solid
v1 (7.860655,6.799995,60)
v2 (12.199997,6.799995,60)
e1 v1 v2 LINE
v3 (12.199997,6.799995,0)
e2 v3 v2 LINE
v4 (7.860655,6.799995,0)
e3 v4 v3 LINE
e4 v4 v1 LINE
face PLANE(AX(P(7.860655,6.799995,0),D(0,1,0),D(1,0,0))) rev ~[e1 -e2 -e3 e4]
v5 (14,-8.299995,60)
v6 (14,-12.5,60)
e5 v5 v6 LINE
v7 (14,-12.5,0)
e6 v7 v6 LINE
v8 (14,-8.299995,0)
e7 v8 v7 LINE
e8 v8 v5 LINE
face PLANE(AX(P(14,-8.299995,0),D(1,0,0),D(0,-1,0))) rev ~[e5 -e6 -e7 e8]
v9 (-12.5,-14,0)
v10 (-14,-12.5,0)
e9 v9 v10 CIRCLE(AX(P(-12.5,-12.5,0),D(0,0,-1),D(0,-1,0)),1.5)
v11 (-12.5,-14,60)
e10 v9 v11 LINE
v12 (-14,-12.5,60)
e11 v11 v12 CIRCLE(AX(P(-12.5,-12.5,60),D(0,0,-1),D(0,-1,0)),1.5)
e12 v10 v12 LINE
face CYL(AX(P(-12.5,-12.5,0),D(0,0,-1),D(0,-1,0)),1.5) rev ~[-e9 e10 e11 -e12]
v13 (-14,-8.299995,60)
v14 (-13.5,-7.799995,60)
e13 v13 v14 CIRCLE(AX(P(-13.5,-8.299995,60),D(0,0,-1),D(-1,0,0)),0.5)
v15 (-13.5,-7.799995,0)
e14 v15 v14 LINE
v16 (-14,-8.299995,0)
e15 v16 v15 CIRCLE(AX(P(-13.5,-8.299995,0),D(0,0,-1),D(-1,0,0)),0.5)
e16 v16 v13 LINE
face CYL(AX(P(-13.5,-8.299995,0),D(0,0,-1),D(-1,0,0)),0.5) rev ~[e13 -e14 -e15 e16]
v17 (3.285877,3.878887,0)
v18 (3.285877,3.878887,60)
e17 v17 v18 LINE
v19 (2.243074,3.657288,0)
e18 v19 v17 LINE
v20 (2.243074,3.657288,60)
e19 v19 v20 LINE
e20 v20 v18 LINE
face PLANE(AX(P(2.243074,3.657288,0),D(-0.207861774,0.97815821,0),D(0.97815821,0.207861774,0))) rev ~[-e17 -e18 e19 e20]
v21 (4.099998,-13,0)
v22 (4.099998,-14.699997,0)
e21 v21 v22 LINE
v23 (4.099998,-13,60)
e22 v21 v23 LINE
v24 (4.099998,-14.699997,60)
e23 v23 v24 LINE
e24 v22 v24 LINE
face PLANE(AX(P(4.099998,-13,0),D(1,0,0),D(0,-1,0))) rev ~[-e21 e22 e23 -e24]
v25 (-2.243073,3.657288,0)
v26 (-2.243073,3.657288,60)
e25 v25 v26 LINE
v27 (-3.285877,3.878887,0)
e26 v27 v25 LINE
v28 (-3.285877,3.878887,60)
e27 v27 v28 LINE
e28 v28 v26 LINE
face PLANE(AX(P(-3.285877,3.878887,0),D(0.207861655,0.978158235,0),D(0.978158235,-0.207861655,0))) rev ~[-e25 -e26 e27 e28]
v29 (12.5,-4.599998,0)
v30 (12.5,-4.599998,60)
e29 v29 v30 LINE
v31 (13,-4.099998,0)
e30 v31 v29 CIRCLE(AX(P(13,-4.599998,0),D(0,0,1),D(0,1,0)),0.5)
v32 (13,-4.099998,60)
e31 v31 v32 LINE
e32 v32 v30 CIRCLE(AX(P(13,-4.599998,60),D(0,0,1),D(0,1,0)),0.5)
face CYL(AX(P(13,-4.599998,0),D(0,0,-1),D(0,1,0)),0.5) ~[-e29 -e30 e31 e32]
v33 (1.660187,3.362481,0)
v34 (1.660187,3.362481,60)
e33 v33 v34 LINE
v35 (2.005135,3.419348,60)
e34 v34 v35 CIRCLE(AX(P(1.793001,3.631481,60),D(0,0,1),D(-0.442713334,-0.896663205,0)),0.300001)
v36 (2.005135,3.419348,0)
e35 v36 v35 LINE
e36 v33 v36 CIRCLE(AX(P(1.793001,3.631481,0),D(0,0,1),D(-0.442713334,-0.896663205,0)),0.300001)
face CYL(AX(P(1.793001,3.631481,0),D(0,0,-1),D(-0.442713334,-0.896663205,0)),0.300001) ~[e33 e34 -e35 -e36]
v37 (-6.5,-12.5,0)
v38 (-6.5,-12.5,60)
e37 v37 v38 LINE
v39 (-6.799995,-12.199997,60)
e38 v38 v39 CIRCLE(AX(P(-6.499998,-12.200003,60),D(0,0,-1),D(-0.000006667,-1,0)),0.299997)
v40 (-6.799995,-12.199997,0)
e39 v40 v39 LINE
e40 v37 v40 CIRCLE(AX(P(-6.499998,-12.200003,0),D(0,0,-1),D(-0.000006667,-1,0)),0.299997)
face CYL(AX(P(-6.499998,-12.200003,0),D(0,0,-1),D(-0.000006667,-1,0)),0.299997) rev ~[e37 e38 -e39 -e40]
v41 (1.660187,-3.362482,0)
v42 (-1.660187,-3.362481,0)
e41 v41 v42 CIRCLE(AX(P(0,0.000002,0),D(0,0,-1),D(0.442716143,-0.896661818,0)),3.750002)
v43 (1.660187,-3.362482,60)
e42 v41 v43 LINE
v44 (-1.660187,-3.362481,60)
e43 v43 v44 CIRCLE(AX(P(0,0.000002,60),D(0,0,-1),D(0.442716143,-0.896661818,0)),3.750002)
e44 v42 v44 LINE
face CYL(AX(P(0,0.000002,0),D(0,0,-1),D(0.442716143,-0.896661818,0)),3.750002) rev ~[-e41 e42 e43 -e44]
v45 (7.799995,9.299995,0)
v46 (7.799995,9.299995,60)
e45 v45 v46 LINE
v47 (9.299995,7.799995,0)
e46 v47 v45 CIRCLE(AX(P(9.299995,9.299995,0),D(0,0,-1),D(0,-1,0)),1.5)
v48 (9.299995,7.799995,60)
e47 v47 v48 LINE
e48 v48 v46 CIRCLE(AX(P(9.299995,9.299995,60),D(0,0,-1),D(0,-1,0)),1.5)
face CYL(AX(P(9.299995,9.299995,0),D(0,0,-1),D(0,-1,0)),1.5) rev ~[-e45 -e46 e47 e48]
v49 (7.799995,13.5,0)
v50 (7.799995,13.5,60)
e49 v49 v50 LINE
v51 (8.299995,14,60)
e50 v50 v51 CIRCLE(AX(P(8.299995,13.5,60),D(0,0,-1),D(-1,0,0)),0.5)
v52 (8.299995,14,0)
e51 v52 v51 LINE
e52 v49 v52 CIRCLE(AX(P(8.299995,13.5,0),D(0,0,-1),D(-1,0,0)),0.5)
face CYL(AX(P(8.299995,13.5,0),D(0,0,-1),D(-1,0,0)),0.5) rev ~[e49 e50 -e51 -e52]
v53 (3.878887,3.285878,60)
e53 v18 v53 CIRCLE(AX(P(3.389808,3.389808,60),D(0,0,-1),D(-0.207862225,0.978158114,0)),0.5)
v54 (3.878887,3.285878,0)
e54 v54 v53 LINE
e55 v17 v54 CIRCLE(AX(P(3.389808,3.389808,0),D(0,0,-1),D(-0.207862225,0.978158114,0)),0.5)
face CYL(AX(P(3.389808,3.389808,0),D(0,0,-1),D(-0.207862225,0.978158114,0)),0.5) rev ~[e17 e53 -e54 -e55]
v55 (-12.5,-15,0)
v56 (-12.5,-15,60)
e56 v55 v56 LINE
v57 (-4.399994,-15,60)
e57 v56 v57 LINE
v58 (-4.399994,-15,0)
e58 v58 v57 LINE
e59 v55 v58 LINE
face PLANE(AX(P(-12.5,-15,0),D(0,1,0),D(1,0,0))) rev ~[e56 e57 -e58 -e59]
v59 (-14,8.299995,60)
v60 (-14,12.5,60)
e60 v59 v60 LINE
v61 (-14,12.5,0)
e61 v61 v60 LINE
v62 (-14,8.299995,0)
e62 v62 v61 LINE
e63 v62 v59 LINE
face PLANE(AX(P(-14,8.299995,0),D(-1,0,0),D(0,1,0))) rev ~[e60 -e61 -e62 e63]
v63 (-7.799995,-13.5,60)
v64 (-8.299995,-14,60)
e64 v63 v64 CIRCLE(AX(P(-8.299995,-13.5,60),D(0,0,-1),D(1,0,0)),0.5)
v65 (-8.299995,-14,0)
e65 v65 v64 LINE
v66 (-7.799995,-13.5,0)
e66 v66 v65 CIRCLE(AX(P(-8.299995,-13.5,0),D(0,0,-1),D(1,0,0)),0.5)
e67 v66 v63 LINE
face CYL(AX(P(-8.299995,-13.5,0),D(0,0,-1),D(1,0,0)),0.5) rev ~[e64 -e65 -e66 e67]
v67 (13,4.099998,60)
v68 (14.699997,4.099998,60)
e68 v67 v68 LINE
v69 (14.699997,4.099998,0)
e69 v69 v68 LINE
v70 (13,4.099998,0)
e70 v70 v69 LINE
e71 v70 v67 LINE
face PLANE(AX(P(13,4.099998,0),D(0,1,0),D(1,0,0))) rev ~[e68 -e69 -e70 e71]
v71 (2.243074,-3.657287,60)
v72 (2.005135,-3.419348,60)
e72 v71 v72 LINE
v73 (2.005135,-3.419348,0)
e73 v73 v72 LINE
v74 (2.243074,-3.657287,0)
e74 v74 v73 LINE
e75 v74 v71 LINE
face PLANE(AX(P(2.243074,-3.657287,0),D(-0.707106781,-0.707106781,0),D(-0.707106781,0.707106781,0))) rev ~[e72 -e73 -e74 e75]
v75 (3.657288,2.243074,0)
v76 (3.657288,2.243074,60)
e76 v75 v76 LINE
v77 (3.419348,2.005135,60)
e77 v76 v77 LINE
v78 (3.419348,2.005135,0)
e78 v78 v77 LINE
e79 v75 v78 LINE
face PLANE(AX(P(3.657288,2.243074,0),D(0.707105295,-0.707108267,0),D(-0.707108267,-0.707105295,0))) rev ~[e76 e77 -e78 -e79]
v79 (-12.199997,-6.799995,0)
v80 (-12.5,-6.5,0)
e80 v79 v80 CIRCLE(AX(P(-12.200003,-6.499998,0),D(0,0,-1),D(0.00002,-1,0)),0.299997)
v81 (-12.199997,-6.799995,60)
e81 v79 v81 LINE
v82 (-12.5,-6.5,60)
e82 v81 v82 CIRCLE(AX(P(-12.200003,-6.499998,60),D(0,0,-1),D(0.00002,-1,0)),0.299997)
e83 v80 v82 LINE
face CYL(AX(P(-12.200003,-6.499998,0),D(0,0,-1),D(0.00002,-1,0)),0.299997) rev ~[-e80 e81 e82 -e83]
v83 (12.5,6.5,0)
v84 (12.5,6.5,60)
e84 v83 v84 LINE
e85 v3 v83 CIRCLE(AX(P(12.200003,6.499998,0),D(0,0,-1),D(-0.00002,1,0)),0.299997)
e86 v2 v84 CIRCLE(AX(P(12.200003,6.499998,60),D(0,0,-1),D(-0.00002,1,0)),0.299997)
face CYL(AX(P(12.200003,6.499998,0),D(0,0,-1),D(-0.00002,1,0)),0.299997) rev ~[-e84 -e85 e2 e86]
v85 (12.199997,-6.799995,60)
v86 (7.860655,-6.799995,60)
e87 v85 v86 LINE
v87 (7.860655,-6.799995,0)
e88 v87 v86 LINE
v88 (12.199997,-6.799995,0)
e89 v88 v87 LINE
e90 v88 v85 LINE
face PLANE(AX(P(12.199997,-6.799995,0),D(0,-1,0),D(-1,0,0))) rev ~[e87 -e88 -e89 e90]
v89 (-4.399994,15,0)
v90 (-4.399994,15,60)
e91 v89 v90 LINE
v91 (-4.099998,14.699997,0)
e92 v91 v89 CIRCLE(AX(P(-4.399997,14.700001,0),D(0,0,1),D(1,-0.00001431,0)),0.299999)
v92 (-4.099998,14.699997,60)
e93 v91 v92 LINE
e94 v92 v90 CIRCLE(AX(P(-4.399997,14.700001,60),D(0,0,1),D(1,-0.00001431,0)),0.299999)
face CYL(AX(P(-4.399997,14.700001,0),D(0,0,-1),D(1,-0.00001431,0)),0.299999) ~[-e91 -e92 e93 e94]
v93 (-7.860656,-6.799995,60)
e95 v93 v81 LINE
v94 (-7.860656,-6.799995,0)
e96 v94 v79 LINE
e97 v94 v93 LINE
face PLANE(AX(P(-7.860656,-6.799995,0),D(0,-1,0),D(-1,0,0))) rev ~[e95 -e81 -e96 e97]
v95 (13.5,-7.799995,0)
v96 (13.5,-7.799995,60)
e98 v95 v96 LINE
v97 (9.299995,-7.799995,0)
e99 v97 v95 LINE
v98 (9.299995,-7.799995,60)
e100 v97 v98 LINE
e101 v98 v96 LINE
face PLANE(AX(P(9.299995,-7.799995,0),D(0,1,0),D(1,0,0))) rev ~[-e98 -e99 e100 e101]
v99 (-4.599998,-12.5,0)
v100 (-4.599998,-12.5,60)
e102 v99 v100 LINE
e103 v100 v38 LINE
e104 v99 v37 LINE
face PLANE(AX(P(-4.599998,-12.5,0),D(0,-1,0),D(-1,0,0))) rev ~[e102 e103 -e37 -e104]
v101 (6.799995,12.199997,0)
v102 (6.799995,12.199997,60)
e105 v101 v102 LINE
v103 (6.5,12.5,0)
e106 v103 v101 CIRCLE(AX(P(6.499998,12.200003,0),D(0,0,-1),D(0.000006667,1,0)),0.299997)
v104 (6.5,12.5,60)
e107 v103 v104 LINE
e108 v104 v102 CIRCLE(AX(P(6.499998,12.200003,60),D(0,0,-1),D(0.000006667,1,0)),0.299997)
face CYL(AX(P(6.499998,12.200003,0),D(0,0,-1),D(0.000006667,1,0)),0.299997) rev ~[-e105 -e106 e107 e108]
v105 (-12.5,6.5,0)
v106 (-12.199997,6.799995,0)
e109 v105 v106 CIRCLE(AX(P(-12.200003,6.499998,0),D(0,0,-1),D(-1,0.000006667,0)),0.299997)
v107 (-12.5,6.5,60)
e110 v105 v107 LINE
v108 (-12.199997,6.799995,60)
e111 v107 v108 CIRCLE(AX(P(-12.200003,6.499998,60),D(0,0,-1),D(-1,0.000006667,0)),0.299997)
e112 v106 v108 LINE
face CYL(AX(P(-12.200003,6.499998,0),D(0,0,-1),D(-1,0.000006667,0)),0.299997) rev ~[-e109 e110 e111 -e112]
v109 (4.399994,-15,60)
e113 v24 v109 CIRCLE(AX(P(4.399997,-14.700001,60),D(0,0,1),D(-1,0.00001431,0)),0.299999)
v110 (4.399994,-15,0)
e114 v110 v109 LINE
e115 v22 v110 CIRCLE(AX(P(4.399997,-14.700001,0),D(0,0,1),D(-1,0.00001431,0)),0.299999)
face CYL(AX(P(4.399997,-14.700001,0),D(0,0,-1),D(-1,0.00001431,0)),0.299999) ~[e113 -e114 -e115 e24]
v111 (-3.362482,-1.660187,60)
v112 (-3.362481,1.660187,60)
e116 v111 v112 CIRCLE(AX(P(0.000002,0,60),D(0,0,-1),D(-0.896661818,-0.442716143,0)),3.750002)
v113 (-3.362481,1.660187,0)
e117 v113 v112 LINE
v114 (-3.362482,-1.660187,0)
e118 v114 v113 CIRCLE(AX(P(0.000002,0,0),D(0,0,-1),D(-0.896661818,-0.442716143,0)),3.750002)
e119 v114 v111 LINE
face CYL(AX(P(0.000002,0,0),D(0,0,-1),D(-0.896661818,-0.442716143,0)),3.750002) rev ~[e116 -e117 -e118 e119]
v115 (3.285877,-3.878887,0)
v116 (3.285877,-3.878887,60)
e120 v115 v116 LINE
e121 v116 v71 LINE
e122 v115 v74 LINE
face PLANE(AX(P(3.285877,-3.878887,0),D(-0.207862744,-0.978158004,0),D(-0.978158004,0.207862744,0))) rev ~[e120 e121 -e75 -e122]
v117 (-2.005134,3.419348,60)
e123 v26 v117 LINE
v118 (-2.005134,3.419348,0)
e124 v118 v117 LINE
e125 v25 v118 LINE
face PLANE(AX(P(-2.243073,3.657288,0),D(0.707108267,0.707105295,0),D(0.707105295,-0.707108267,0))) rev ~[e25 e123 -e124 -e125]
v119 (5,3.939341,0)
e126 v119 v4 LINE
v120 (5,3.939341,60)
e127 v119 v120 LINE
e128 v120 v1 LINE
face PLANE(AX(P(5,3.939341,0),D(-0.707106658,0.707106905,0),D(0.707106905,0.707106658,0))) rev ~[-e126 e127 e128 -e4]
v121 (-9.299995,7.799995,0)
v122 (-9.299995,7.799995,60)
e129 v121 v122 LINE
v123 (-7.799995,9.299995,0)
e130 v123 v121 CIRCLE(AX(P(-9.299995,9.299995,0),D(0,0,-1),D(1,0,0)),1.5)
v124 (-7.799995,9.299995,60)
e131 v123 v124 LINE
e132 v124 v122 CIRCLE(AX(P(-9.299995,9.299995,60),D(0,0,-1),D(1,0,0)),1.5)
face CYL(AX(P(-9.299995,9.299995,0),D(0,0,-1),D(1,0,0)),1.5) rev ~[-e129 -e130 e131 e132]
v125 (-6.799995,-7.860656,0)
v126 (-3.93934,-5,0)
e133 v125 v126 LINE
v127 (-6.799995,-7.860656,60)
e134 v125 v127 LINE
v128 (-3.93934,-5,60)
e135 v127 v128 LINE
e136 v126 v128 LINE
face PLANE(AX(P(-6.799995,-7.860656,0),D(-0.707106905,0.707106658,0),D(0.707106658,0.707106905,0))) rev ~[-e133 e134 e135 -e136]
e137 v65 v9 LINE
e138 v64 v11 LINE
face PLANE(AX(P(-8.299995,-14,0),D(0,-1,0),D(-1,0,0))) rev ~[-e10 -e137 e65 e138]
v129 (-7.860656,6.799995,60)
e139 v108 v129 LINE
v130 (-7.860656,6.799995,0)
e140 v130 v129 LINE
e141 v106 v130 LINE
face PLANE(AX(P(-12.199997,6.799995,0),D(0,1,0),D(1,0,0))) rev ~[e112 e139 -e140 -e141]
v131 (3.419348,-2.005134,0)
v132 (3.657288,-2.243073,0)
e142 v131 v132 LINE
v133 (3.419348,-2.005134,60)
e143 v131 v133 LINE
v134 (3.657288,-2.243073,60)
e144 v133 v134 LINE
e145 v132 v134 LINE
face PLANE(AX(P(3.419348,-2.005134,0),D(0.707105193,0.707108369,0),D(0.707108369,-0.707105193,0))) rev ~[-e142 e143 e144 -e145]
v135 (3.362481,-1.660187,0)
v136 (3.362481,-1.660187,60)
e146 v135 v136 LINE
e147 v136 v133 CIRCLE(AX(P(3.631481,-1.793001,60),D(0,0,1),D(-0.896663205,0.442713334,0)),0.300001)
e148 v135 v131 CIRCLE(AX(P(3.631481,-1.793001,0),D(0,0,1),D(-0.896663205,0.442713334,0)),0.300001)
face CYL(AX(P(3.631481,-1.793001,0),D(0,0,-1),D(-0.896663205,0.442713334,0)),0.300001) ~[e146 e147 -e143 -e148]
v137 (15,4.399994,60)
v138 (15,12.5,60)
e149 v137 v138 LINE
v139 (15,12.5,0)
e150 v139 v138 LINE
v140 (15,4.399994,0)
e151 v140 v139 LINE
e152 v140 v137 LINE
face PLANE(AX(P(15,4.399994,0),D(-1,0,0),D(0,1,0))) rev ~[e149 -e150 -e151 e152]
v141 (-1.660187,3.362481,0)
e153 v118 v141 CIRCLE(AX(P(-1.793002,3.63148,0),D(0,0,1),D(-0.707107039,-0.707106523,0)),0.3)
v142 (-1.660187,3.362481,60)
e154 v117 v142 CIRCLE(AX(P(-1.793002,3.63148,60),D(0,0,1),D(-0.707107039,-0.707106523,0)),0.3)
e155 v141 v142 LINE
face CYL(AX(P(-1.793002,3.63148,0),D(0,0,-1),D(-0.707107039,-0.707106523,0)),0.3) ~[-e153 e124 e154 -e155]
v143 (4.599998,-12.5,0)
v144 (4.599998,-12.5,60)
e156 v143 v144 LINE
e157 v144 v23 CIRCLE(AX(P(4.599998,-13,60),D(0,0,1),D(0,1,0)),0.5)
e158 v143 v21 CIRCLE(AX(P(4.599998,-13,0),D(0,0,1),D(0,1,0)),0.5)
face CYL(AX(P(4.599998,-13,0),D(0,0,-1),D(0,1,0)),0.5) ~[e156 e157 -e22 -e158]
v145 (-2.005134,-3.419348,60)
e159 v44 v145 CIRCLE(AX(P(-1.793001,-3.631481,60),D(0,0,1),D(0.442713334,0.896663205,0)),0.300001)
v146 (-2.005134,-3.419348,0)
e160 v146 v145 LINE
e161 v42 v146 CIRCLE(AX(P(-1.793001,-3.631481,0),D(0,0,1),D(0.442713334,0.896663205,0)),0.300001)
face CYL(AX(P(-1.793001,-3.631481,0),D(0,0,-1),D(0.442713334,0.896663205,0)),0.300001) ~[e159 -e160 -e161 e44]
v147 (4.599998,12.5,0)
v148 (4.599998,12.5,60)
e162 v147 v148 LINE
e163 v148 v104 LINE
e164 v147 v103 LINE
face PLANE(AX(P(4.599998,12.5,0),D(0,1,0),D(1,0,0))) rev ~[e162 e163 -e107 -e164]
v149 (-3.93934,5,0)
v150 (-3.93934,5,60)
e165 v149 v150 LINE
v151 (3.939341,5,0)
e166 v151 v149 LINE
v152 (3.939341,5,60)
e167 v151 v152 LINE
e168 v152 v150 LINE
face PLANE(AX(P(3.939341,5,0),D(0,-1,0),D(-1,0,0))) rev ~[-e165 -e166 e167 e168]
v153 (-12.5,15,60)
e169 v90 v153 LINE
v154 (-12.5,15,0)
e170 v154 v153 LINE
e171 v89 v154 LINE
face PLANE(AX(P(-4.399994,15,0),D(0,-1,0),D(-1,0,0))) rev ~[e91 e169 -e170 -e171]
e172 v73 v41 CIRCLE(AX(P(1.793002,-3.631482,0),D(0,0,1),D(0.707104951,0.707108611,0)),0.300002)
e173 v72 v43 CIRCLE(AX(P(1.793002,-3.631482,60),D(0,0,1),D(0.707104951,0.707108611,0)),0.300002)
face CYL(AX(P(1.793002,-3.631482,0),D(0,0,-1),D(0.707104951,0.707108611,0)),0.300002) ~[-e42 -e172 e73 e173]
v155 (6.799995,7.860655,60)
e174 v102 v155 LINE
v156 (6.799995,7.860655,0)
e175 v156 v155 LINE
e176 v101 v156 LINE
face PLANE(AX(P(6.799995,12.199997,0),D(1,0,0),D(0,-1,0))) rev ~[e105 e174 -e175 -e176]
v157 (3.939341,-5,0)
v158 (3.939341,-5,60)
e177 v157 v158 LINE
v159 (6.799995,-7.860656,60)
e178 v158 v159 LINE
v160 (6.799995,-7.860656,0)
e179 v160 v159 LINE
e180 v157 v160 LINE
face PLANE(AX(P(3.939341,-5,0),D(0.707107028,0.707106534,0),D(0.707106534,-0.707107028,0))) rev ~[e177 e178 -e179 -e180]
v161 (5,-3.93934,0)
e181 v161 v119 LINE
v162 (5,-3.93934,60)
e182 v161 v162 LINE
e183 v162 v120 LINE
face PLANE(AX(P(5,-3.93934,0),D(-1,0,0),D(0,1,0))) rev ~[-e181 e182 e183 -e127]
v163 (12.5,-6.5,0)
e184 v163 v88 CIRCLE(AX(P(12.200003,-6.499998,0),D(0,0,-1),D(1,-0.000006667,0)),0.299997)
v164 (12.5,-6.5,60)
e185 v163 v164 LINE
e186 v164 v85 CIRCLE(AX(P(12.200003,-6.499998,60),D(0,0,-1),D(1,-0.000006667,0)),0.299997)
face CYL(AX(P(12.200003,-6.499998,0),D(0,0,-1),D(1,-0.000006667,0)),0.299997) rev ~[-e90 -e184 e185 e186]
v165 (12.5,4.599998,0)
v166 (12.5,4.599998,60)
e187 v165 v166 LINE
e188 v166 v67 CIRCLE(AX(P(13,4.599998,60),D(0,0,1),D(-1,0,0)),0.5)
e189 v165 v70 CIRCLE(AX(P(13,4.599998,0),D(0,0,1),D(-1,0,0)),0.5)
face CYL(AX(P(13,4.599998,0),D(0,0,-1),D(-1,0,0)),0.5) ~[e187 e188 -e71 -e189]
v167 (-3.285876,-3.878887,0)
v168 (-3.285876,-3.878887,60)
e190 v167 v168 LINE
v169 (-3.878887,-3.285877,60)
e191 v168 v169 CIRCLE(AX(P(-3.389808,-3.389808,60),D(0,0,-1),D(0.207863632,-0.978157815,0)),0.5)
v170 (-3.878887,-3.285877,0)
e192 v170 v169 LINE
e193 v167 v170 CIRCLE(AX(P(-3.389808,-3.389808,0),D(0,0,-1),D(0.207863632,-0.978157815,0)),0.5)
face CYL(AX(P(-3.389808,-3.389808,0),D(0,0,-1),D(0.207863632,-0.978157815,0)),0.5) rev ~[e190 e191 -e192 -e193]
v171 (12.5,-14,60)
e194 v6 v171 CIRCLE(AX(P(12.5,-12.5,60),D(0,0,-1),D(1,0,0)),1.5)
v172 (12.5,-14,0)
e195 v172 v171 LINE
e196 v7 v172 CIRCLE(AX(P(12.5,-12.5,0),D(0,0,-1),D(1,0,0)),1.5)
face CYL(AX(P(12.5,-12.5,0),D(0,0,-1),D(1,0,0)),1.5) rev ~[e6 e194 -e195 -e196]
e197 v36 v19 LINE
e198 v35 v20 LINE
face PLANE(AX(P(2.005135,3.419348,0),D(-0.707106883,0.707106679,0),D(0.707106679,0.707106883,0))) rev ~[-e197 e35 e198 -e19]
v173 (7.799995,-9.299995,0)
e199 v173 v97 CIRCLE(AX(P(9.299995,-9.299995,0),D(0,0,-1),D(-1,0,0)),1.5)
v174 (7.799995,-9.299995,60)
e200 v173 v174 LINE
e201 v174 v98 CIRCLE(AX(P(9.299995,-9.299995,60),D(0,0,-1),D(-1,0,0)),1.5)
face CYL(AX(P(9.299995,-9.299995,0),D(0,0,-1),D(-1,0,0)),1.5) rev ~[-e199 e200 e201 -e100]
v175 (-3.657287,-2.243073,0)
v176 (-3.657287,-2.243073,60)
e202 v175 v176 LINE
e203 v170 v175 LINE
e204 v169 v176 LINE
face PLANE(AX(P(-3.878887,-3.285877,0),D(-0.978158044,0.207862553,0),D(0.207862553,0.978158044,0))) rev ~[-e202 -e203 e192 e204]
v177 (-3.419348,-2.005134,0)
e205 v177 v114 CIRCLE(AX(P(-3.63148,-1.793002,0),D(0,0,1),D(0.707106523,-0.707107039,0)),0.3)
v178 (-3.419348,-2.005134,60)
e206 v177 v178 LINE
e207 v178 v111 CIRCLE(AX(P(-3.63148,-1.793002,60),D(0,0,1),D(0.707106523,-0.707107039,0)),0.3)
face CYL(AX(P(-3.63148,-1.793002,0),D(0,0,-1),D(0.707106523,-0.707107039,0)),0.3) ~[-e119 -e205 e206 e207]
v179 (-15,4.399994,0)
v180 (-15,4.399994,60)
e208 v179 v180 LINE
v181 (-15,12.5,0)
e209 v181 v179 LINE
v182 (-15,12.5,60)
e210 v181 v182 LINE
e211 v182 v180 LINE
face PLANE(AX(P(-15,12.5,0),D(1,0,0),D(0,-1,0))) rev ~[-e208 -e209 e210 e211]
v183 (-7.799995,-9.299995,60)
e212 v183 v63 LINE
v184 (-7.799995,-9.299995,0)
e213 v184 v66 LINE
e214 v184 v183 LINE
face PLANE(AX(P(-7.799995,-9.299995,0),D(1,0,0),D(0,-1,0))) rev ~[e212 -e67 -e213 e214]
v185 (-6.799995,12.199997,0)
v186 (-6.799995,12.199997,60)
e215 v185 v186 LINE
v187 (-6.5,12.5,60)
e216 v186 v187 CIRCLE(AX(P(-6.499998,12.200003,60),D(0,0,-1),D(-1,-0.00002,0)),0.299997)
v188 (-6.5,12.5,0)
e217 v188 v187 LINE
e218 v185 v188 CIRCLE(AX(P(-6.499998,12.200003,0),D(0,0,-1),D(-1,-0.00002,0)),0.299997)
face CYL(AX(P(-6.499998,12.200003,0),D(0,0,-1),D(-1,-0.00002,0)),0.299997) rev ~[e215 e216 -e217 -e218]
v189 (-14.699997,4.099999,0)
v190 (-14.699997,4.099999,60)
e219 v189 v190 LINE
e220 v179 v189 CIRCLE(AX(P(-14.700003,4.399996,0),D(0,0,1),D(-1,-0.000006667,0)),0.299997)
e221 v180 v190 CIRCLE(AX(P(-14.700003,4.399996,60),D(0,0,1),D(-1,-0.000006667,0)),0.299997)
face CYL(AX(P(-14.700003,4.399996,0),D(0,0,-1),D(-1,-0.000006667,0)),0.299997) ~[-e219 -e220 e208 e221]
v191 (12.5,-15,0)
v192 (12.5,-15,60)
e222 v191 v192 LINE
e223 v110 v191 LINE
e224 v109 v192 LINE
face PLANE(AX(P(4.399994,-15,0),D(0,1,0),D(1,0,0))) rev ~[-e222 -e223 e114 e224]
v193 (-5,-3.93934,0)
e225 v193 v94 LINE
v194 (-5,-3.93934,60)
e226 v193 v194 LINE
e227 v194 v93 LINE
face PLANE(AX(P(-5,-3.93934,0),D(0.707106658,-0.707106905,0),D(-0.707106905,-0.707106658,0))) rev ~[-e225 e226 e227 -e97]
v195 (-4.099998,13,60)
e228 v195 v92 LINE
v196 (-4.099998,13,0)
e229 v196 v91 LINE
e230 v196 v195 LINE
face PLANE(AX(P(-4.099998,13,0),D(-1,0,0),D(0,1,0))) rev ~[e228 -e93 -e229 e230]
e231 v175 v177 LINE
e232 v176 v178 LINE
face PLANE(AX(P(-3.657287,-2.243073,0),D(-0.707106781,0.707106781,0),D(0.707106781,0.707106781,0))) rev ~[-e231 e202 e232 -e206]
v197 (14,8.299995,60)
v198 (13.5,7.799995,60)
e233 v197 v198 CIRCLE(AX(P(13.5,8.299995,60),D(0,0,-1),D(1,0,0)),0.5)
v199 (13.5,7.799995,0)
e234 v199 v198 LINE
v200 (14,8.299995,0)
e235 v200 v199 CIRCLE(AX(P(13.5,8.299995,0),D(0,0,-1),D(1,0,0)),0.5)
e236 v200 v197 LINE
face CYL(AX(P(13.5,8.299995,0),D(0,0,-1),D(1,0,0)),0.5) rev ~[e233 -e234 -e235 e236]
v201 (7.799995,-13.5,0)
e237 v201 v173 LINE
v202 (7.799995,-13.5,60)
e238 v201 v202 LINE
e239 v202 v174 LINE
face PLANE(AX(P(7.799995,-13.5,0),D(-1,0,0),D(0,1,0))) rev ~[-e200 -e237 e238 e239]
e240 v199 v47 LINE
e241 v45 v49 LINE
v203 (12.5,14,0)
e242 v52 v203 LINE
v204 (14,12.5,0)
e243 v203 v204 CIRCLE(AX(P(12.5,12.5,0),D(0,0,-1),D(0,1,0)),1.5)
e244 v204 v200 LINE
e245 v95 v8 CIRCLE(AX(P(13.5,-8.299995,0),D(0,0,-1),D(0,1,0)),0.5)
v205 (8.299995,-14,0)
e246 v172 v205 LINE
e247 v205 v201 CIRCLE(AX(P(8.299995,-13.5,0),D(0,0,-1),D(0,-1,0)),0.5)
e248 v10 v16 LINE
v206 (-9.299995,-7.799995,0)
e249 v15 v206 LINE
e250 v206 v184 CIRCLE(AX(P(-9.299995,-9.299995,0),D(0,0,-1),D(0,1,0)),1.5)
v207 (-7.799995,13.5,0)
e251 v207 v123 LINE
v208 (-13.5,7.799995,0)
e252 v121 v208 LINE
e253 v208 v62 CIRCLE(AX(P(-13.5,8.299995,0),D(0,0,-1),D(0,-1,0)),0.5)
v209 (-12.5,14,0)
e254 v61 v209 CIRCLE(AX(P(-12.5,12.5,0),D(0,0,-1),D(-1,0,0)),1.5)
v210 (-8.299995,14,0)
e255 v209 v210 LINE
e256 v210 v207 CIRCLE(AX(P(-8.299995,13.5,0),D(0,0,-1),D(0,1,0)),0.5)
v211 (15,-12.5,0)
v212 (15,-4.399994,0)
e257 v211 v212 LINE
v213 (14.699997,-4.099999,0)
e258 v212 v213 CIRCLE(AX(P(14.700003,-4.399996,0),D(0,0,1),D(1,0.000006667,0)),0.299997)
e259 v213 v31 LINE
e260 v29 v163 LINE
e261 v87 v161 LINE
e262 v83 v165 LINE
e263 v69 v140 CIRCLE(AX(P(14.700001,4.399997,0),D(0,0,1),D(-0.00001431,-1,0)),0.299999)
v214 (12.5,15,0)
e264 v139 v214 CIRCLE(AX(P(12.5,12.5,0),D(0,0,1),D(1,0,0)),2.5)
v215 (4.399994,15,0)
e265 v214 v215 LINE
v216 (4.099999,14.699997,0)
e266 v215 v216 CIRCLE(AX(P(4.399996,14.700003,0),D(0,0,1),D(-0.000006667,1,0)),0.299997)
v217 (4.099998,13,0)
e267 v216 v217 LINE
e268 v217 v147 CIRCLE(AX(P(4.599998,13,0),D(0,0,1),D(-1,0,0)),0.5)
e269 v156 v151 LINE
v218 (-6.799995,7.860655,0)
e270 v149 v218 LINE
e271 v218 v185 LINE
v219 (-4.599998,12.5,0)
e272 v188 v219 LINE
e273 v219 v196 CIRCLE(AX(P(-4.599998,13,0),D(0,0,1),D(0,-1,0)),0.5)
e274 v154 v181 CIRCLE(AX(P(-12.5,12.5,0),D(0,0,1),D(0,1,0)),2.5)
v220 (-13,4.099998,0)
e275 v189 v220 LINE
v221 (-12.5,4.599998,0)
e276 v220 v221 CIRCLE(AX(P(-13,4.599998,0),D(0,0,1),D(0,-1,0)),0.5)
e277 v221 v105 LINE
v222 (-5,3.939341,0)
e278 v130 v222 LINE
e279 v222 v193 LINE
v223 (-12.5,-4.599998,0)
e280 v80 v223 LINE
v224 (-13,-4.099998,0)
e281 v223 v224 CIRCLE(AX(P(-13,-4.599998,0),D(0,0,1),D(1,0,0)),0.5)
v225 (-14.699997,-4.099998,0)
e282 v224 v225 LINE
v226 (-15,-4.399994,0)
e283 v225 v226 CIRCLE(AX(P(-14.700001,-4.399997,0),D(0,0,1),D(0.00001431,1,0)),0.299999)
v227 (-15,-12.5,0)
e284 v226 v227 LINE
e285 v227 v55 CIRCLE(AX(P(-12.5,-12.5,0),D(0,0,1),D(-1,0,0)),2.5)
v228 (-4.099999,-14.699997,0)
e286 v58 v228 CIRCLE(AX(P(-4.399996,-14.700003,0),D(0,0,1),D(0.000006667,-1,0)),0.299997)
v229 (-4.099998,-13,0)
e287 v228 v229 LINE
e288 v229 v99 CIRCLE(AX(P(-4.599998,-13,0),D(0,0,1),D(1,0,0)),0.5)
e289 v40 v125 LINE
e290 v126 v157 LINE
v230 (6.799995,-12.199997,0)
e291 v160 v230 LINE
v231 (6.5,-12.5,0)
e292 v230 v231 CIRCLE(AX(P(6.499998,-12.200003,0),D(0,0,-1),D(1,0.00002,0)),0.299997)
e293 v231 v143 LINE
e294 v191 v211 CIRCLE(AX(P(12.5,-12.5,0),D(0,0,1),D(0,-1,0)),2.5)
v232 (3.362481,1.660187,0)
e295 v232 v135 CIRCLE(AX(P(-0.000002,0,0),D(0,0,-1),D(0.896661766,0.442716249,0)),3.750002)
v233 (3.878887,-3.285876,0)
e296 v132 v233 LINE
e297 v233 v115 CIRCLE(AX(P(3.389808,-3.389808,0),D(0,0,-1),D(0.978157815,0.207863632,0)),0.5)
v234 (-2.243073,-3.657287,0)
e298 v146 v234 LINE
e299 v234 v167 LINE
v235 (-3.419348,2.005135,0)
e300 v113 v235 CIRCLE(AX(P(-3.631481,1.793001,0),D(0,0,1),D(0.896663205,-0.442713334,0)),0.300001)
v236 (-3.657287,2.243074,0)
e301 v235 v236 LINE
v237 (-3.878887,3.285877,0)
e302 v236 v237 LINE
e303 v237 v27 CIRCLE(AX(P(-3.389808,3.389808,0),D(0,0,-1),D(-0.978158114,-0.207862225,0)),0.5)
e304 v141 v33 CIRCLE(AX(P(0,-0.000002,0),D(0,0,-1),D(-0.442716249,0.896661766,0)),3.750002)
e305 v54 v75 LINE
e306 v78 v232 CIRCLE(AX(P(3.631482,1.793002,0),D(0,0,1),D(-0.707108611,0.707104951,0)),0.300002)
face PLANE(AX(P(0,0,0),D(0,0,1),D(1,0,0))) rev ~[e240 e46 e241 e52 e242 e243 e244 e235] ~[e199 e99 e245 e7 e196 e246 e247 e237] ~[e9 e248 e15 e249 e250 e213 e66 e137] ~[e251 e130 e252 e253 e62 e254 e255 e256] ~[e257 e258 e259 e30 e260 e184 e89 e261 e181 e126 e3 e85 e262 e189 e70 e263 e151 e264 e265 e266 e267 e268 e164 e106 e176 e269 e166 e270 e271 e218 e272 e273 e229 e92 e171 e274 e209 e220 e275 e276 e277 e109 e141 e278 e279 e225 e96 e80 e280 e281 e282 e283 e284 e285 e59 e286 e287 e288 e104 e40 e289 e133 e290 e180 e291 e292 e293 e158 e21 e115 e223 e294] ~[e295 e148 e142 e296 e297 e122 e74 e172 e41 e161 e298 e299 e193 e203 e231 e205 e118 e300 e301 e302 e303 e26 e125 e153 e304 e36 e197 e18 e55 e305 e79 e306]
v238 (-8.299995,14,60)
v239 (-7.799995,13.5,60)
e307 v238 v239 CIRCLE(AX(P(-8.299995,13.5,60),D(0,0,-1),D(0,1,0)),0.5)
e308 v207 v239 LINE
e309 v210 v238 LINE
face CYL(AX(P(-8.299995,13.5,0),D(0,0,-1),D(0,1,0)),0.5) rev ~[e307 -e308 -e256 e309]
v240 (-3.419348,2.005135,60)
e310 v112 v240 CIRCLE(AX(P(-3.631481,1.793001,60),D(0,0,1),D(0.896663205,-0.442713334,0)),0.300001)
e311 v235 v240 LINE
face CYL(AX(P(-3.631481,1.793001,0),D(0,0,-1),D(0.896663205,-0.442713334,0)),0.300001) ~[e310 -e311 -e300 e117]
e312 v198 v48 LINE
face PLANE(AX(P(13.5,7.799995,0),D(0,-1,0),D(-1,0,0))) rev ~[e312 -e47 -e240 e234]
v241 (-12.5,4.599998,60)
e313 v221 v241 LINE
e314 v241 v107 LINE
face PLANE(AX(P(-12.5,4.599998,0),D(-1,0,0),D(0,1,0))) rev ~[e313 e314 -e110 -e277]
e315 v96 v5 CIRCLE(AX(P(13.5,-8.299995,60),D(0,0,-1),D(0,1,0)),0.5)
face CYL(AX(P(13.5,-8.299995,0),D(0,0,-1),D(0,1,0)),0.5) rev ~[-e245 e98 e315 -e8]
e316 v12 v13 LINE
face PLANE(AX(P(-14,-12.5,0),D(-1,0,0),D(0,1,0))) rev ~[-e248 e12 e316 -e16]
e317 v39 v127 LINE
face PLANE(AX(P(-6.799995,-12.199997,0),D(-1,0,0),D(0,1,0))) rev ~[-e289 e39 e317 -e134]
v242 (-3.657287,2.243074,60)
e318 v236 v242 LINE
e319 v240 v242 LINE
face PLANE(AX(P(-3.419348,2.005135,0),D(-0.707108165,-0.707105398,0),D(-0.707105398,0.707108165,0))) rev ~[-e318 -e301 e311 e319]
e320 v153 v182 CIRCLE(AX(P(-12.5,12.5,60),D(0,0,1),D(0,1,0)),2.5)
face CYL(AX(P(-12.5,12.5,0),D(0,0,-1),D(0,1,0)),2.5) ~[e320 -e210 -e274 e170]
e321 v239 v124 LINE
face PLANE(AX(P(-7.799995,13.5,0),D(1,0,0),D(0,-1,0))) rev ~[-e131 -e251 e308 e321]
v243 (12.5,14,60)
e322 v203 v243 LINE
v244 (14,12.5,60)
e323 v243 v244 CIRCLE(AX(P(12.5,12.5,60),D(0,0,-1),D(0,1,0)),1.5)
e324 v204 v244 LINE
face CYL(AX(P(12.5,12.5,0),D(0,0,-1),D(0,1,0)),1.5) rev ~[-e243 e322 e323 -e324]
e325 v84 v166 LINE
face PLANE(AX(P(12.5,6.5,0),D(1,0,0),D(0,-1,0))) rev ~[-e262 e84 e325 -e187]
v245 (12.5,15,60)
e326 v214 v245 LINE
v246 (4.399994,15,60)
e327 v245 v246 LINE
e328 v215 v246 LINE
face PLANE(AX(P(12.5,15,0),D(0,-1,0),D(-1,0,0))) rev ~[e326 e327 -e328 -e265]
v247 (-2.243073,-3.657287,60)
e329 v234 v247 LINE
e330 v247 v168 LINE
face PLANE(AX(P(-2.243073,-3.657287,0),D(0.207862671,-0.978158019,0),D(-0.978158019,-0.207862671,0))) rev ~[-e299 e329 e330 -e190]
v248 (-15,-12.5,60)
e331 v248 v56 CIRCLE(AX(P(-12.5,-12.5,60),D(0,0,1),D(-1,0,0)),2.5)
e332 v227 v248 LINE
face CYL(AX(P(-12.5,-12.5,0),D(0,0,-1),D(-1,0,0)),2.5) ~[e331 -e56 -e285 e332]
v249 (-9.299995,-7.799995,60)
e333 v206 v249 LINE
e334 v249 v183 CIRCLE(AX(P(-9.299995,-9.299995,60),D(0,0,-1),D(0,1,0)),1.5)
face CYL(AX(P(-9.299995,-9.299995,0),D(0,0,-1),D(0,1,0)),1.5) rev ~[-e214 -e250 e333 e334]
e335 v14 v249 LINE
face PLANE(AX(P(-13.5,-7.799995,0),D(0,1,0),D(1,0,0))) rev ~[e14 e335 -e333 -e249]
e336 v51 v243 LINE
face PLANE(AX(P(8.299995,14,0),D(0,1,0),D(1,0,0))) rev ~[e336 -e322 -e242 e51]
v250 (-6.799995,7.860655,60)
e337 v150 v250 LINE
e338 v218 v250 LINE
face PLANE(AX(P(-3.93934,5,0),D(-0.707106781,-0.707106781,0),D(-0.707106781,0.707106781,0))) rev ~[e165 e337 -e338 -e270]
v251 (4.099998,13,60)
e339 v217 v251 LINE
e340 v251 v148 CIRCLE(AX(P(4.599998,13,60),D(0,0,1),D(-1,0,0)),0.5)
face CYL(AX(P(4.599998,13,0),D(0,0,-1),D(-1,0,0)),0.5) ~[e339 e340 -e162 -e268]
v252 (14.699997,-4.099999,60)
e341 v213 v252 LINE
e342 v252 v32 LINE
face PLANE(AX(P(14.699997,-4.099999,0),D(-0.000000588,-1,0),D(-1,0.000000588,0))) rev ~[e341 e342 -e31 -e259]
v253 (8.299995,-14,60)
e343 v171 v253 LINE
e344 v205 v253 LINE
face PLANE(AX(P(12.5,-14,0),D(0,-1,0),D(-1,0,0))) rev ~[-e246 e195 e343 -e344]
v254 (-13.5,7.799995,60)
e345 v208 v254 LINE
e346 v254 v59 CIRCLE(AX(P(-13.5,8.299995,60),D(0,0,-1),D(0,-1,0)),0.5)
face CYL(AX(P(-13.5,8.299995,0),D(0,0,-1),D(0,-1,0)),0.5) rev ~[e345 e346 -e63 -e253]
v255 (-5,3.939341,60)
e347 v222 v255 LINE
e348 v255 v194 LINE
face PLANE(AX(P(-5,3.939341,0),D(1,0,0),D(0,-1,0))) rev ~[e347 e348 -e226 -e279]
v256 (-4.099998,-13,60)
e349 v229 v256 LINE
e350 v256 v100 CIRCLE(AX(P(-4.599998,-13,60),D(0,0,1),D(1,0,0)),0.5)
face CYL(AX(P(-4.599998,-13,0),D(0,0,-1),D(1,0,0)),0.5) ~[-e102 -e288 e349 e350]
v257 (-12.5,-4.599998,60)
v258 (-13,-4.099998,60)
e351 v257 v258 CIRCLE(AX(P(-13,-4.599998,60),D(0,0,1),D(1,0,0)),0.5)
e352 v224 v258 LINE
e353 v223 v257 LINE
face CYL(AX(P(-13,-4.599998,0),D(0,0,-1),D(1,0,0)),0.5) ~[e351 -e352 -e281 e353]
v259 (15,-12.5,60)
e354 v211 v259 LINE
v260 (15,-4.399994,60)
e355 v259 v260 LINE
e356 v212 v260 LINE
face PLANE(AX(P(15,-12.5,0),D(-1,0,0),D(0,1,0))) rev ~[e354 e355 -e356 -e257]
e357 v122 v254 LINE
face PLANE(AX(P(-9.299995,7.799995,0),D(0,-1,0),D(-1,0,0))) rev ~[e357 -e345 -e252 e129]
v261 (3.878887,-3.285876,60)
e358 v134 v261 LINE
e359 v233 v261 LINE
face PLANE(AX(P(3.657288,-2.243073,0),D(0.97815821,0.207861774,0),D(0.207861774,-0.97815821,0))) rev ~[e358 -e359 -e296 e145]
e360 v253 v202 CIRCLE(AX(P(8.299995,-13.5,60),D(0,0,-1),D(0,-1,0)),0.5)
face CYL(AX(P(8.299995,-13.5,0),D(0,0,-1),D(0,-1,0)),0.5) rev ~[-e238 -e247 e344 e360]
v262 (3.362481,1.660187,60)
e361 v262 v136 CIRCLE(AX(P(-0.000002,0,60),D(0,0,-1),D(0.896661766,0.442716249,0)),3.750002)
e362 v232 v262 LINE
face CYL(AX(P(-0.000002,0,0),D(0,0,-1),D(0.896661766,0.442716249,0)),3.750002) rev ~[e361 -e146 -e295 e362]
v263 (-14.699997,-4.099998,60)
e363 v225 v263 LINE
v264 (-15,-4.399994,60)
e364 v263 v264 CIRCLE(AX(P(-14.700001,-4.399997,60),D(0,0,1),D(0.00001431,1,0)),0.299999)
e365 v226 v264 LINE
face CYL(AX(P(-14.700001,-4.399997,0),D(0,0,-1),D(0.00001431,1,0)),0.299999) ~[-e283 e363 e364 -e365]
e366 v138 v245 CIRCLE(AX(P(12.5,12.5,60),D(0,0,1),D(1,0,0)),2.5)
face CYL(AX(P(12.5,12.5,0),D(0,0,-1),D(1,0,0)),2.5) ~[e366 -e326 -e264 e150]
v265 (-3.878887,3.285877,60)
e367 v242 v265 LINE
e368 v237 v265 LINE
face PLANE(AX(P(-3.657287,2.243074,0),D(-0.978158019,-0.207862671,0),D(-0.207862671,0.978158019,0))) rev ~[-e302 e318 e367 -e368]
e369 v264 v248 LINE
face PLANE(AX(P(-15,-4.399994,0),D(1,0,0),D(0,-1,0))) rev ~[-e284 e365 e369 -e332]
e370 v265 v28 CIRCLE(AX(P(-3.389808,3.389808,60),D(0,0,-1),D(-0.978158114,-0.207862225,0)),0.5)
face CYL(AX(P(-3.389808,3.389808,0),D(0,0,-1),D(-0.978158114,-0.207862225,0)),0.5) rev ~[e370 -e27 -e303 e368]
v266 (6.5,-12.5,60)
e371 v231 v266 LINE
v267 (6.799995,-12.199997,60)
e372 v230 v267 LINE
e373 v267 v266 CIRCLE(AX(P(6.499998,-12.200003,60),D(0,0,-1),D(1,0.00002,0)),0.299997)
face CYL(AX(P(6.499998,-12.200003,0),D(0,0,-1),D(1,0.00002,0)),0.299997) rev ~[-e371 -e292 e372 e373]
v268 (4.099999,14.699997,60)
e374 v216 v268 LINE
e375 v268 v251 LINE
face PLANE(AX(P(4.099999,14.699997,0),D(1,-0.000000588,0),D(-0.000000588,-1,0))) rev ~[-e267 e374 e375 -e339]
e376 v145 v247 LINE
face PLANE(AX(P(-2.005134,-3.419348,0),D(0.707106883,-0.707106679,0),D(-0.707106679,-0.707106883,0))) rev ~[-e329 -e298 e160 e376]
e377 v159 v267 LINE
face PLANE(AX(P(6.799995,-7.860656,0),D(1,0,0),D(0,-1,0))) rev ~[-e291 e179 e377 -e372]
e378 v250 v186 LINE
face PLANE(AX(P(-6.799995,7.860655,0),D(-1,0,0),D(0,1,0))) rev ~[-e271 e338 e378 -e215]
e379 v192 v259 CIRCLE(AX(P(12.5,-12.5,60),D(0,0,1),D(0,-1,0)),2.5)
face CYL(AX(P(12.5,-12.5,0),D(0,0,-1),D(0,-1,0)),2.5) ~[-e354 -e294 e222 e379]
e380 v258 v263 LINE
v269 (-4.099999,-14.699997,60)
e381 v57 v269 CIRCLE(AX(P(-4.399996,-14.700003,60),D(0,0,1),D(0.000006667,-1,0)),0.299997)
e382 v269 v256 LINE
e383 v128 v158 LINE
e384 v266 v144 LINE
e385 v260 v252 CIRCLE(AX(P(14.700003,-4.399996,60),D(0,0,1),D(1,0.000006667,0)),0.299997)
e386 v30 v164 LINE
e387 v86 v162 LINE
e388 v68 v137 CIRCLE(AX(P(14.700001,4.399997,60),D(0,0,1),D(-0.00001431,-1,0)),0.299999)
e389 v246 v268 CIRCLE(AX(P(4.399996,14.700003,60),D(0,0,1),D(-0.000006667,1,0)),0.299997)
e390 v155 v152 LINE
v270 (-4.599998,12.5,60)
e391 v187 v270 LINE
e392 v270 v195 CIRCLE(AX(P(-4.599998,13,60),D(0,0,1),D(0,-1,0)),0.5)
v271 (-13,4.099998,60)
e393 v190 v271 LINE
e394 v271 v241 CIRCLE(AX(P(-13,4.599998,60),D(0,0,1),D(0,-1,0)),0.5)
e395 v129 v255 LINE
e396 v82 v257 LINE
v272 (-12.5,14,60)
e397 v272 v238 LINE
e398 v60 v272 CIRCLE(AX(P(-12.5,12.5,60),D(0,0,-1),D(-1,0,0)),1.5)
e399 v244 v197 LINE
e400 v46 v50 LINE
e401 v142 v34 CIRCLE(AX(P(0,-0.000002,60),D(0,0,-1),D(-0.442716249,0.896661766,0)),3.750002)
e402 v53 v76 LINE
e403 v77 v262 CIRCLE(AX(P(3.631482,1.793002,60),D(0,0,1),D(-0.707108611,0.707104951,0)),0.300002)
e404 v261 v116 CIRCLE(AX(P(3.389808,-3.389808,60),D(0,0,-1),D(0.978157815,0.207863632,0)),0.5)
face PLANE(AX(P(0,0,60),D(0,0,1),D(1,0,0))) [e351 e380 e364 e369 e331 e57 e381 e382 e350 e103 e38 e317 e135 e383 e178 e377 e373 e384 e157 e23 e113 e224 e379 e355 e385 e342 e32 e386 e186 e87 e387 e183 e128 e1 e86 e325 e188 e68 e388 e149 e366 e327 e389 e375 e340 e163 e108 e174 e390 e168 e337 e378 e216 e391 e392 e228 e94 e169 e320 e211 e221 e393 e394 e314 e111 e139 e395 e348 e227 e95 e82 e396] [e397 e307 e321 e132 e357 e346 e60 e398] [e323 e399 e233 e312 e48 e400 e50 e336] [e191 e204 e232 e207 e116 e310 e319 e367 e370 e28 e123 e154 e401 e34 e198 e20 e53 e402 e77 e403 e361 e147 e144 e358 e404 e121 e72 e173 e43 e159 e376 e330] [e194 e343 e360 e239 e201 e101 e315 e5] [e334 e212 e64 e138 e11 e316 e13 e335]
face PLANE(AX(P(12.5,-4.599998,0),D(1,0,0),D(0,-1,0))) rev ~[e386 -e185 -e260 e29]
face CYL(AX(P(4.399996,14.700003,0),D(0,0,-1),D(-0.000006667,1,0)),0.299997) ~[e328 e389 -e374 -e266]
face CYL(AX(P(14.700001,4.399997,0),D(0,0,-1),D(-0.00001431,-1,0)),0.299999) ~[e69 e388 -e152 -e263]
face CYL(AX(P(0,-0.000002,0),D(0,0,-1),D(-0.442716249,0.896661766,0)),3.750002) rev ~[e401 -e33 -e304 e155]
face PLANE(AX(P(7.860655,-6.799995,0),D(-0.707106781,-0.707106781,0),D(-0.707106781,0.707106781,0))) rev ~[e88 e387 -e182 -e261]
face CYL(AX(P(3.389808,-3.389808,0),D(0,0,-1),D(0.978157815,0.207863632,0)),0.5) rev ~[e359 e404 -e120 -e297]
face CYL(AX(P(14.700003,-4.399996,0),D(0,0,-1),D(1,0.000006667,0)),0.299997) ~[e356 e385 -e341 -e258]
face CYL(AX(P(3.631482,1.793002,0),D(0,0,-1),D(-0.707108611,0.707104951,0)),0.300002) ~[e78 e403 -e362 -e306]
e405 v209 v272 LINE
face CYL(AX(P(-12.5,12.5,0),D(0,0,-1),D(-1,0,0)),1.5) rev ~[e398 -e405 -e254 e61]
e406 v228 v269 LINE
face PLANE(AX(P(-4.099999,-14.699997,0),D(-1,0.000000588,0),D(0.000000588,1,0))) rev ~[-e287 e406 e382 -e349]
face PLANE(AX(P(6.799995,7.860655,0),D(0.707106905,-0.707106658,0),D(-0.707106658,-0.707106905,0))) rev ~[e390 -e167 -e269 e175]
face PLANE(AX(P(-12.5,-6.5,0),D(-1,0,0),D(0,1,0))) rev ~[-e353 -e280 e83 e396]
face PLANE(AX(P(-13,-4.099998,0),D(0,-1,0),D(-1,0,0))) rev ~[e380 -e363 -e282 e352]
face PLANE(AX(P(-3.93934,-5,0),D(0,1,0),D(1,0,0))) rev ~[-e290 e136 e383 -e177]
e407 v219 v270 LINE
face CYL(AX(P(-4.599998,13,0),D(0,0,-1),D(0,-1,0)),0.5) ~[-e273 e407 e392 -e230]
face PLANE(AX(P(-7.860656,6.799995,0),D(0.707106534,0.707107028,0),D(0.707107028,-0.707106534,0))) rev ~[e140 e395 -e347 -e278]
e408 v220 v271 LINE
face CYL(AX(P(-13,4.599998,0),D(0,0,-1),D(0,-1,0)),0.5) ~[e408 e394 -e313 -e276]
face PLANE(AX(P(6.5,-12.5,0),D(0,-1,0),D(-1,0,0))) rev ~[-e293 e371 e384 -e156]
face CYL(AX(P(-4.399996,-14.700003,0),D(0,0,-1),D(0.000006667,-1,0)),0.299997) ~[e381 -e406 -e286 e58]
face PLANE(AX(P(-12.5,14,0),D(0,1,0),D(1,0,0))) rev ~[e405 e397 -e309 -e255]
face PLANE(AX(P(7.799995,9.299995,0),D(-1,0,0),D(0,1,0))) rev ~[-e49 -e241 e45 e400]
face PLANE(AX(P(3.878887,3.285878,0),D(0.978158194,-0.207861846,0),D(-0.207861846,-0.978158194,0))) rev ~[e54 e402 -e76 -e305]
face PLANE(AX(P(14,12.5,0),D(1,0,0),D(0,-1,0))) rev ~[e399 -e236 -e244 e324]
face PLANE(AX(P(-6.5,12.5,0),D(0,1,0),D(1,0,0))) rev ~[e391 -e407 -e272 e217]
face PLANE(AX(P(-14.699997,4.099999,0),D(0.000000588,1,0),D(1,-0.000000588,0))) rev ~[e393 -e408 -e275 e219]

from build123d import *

# Parameters (mm, degrees)
F1_DEPTH = 60


# Not quite as in the source:
# - ends of sketch curves that miss each other by under 0.0002 mm in the source are joined
# - the program builds the solid bodies; features that only make, move or delete a surface that nothing else refers to are left out


with BuildPart() as f1:
    # F0 (on Top) → F1 (new body)
    with BuildSketch(Plane.XY):
        with BuildLine():
            Line((3.939341, -5), (6.799995, -7.860656))
            Line((6.799995, -7.860656), (6.799995, -12.199997))
            ThreePointArc((6.799995, -12.199997), (6.7121307415, -12.4121300846), (6.5, -12.5))
            Line((6.5, -12.5), (4.599998, -12.5))
            ThreePointArc((4.599998, -12.5), (4.2464446094, -12.6464466094), (4.099998, -13))
            Line((4.099998, -13), (4.099998, -14.699997))
            ThreePointArc((4.099998, -14.699997), (4.1878632585, -14.9121300846), (4.399994, -15))
            Line((4.399994, -15), (12.5, -15))
            ThreePointArc((12.5, -15), (14.267766953, -14.267766953), (15, -12.5))
            Line((15, -12.5), (15, -4.399994))
            ThreePointArc((15, -4.399994), (14.9121300846, -4.1878632585), (14.699997, -4.099999))
            Line((14.699997, -4.099999), (13, -4.099998))
            ThreePointArc((13, -4.099998), (12.6464466094, -4.2464446094), (12.5, -4.599998))
            Line((12.5, -4.599998), (12.5, -6.5))
            ThreePointArc((12.5, -6.5), (12.4121300846, -6.7121307415), (12.199997, -6.799995))
            Line((12.199997, -6.799995), (7.860655, -6.799995))
            Line((7.860655, -6.799995), (5, -3.93934))
            Line((5, -3.93934), (5, 3.939341))
            Line((5, 3.939341), (7.860655, 6.799995))
            Line((7.860655, 6.799995), (12.199997, 6.799995))
            ThreePointArc((12.199997, 6.799995), (12.4121300846, 6.7121307415), (12.5, 6.5))
            Line((12.5, 6.5), (12.5, 4.599998))
            ThreePointArc((12.5, 4.599998), (12.6464466094, 4.2464446094), (13, 4.099998))
            Line((13, 4.099998), (14.699997, 4.099998))
            ThreePointArc((14.699997, 4.099998), (14.9121300846, 4.1878632585), (15, 4.399994))
            Line((15, 4.399994), (15, 12.5))
            ThreePointArc((15, 12.5), (14.267766953, 14.267766953), (12.5, 15))
            Line((12.5, 15), (4.399994, 15))
            ThreePointArc((4.399994, 15), (4.1878632585, 14.9121300846), (4.099999, 14.699997))
            Line((4.099999, 14.699997), (4.099998, 13))
            ThreePointArc((4.099998, 13), (4.2464446094, 12.6464466094), (4.599998, 12.5))
            Line((4.599998, 12.5), (6.5, 12.5))
            ThreePointArc((6.5, 12.5), (6.7121307415, 12.4121300846), (6.799995, 12.199997))
            Line((6.799995, 12.199997), (6.799995, 7.860655))
            Line((6.799995, 7.860655), (3.939341, 5))
            Line((3.939341, 5), (-3.93934, 5))
            Line((-3.93934, 5), (-6.799995, 7.860655))
            Line((-6.799995, 7.860655), (-6.799995, 12.199997))
            ThreePointArc((-6.799995, 12.199997), (-6.7121307415, 12.4121300846), (-6.5, 12.5))
            Line((-6.5, 12.5), (-4.599998, 12.5))
            ThreePointArc((-4.599998, 12.5), (-4.2464446094, 12.6464466094), (-4.099998, 13))
            Line((-4.099998, 13), (-4.099998, 14.699997))
            ThreePointArc((-4.099998, 14.699997), (-4.1878632585, 14.9121300846), (-4.399994, 15))
            Line((-4.399994, 15), (-12.5, 15))
            ThreePointArc((-12.5, 15), (-14.267766953, 14.267766953), (-15, 12.5))
            Line((-15, 12.5), (-15, 4.399994))
            ThreePointArc((-15, 4.399994), (-14.9121300846, 4.1878632585), (-14.699997, 4.099999))
            Line((-14.699997, 4.099999), (-13, 4.099998))
            ThreePointArc((-13, 4.099998), (-12.6464466094, 4.2464446094), (-12.5, 4.599998))
            Line((-12.5, 4.599998), (-12.5, 6.5))
            ThreePointArc((-12.5, 6.5), (-12.4121300846, 6.7121307415), (-12.199997, 6.799995))
            Line((-12.199997, 6.799995), (-7.860656, 6.799995))
            Line((-7.860656, 6.799995), (-5, 3.939341))
            Line((-5, 3.939341), (-5, -3.93934))
            Line((-5, -3.93934), (-7.860656, -6.799995))
            Line((-7.860656, -6.799995), (-12.199997, -6.799995))
            ThreePointArc((-12.199997, -6.799995), (-12.4121300846, -6.7121307415), (-12.5, -6.5))
            Line((-12.5, -6.5), (-12.5, -4.599998))
            ThreePointArc((-12.5, -4.599998), (-12.6464466094, -4.2464446094), (-13, -4.099998))
            Line((-13, -4.099998), (-14.699997, -4.099998))
            ThreePointArc((-14.699997, -4.099998), (-14.9121300846, -4.1878632585), (-15, -4.399994))
            Line((-15, -4.399994), (-15, -12.5))
            ThreePointArc((-15, -12.5), (-14.267766953, -14.267766953), (-12.5, -15))
            Line((-12.5, -15), (-4.399994, -15))
            ThreePointArc((-4.399994, -15), (-4.1878632585, -14.9121300846), (-4.099999, -14.699997))
            Line((-4.099999, -14.699997), (-4.099998, -13))
            ThreePointArc((-4.099998, -13), (-4.2464446094, -12.6464466094), (-4.599998, -12.5))
            Line((-4.599998, -12.5), (-6.5, -12.5))
            ThreePointArc((-6.5, -12.5), (-6.7121307415, -12.4121300846), (-6.799995, -12.199997))
            Line((-6.799995, -12.199997), (-6.799995, -7.860656))
            Line((-6.799995, -7.860656), (-3.93934, -5))
            Line((-3.93934, -5), (3.939341, -5))
        make_face()
        with BuildLine():
            Line((-8.299995, -14), (-12.5, -14))
            ThreePointArc((-12.5, -14), (-13.5606601718, -13.5606601718), (-14, -12.5))
            Line((-14, -12.5), (-14, -8.299995))
            ThreePointArc((-14, -8.299995), (-13.8535533906, -7.9464416094), (-13.5, -7.799995))
            Line((-13.5, -7.799995), (-9.299995, -7.799995))
            ThreePointArc((-9.299995, -7.799995), (-8.2393348282, -8.2393348282), (-7.799995, -9.299995))
            Line((-7.799995, -9.299995), (-7.799995, -13.5))
            ThreePointArc((-7.799995, -13.5), (-7.9464416094, -13.8535533906), (-8.299995, -14))
        make_face(mode=Mode.SUBTRACT)
        with BuildLine():
            Line((12.5, -14), (8.299995, -14))
            ThreePointArc((8.299995, -14), (7.9464416094, -13.8535533906), (7.799995, -13.5))
            Line((7.799995, -13.5), (7.799995, -9.299995))
            ThreePointArc((7.799995, -9.299995), (8.2393348282, -8.2393348282), (9.299995, -7.799995))
            Line((9.299995, -7.799995), (13.5, -7.799995))
            ThreePointArc((13.5, -7.799995), (13.8535533906, -7.9464416094), (14, -8.299995))
            Line((14, -8.299995), (14, -12.5))
            ThreePointArc((14, -12.5), (13.5606601718, -13.5606601718), (12.5, -14))
        make_face(mode=Mode.SUBTRACT)
        with BuildLine():
            Line((3.657288, -2.243073), (3.878887, -3.285876))
            ThreePointArc((3.878887, -3.285876), (3.7433613906, -3.7433613906), (3.2858769836, -3.8788870773))
            Line((3.2858769836, -3.8788870773), (2.243074, -3.657287))
            Line((2.243074, -3.657287), (2.005135, -3.419348))
            ThreePointArc((2.005135, -3.419348), (1.841799908, -3.3354753308), (1.6601868142, -3.3624816237))
            ThreePointArc((1.6601868142, -3.3624816237), (0, -3.75), (-1.6601870383, -3.3624810777))
            ThreePointArc((-1.6601870383, -3.3624810777), (-1.841799908, -3.3354753308), (-2.0051340344, -3.4193479656))
            Line((-2.0051340344, -3.4193479656), (-2.243073, -3.657287))
            Line((-2.243073, -3.657287), (-3.285876, -3.878887))
            ThreePointArc((-3.285876, -3.878887), (-3.7433613906, -3.7433613906), (-3.8788870773, -3.2858769836))
            Line((-3.8788870773, -3.2858769836), (-3.657287, -2.243073))
            Line((-3.657287, -2.243073), (-3.419348, -2.005134))
            ThreePointArc((-3.419348, -2.005134), (-3.3354753308, -1.841799908), (-3.3624816237, -1.6601868142))
            ThreePointArc((-3.3624816237, -1.6601868142), (-3.75, 0), (-3.3624810777, 1.6601870383))
            ThreePointArc((-3.3624810777, 1.6601870383), (-3.3354753883, 1.8418002569), (-3.4193484656, 2.0051345344))
            Line((-3.4193484656, 2.0051345344), (-3.657287, 2.243074))
            Line((-3.657287, 2.243074), (-3.878887, 3.285877))
            ThreePointArc((-3.878887, 3.285877), (-3.7433613906, 3.7433613906), (-3.2858769836, 3.8788870773))
            Line((-3.2858769836, 3.8788870773), (-2.243073, 3.657288))
            Line((-2.243073, 3.657288), (-2.005134, 3.419348))
            ThreePointArc((-2.005134, 3.419348), (-1.8418001264, 3.3354753668), (-1.6601872112, 3.3624814277))
            ThreePointArc((-1.6601872112, 3.3624814277), (0, 3.75), (1.6601870383, 3.3624810777))
            ThreePointArc((1.6601870383, 3.3624810777), (1.8418002569, 3.3354753883), (2.0051345344, 3.4193484656))
            Line((2.0051345344, 3.4193484656), (2.243074, 3.657288))
            Line((2.243074, 3.657288), (3.285877, 3.878887))
            ThreePointArc((3.285877, 3.878887), (3.7433610448, 3.7433617364), (3.8788872806, 3.2858779404))
            Line((3.8788872806, 3.2858779404), (3.657288, 2.243074))
            Line((3.657288, 2.243074), (3.419348, 2.005135))
            ThreePointArc((3.419348, 2.005135), (3.3354753668, 1.8418001264), (3.3624814277, 1.6601872112))
            ThreePointArc((3.3624814277, 1.6601872112), (3.75, 0), (3.3624810777, -1.6601870383))
            ThreePointArc((3.3624810777, -1.6601870383), (3.3354753308, -1.841799908), (3.4193479656, -2.0051340344))
            Line((3.4193479656, -2.0051340344), (3.657288, -2.243073))
        make_face(mode=Mode.SUBTRACT)
        with BuildLine():
            Line((-9.299995, 7.799995), (-13.5, 7.799995))
            ThreePointArc((-13.5, 7.799995), (-13.8535533906, 7.9464416094), (-14, 8.299995))
            Line((-14, 8.299995), (-14, 12.5))
            ThreePointArc((-14, 12.5), (-13.5606601718, 13.5606601718), (-12.5, 14))
            Line((-12.5, 14), (-8.299995, 14))
            ThreePointArc((-8.299995, 14), (-7.9464416094, 13.8535533906), (-7.799995, 13.5))
            Line((-7.799995, 13.5), (-7.799995, 9.299995))
            ThreePointArc((-7.799995, 9.299995), (-8.2393348282, 8.2393348282), (-9.299995, 7.799995))
        make_face(mode=Mode.SUBTRACT)
        with BuildLine():
            Line((13.5, 7.799995), (9.299995, 7.799995))
            ThreePointArc((9.299995, 7.799995), (8.2393348282, 8.2393348282), (7.799995, 9.299995))
            Line((7.799995, 9.299995), (7.799995, 13.5))
            ThreePointArc((7.799995, 13.5), (7.9464416094, 13.8535533906), (8.299995, 14))
            Line((8.299995, 14), (12.5, 14))
            ThreePointArc((12.5, 14), (13.5606601718, 13.5606601718), (14, 12.5))
            Line((14, 12.5), (14, 8.299995))
            ThreePointArc((14, 8.299995), (13.8535533906, 7.9464416094), (13.5, 7.799995))
        make_face(mode=Mode.SUBTRACT)
    extrude(amount=F1_DEPTH)


solid = f1.part
